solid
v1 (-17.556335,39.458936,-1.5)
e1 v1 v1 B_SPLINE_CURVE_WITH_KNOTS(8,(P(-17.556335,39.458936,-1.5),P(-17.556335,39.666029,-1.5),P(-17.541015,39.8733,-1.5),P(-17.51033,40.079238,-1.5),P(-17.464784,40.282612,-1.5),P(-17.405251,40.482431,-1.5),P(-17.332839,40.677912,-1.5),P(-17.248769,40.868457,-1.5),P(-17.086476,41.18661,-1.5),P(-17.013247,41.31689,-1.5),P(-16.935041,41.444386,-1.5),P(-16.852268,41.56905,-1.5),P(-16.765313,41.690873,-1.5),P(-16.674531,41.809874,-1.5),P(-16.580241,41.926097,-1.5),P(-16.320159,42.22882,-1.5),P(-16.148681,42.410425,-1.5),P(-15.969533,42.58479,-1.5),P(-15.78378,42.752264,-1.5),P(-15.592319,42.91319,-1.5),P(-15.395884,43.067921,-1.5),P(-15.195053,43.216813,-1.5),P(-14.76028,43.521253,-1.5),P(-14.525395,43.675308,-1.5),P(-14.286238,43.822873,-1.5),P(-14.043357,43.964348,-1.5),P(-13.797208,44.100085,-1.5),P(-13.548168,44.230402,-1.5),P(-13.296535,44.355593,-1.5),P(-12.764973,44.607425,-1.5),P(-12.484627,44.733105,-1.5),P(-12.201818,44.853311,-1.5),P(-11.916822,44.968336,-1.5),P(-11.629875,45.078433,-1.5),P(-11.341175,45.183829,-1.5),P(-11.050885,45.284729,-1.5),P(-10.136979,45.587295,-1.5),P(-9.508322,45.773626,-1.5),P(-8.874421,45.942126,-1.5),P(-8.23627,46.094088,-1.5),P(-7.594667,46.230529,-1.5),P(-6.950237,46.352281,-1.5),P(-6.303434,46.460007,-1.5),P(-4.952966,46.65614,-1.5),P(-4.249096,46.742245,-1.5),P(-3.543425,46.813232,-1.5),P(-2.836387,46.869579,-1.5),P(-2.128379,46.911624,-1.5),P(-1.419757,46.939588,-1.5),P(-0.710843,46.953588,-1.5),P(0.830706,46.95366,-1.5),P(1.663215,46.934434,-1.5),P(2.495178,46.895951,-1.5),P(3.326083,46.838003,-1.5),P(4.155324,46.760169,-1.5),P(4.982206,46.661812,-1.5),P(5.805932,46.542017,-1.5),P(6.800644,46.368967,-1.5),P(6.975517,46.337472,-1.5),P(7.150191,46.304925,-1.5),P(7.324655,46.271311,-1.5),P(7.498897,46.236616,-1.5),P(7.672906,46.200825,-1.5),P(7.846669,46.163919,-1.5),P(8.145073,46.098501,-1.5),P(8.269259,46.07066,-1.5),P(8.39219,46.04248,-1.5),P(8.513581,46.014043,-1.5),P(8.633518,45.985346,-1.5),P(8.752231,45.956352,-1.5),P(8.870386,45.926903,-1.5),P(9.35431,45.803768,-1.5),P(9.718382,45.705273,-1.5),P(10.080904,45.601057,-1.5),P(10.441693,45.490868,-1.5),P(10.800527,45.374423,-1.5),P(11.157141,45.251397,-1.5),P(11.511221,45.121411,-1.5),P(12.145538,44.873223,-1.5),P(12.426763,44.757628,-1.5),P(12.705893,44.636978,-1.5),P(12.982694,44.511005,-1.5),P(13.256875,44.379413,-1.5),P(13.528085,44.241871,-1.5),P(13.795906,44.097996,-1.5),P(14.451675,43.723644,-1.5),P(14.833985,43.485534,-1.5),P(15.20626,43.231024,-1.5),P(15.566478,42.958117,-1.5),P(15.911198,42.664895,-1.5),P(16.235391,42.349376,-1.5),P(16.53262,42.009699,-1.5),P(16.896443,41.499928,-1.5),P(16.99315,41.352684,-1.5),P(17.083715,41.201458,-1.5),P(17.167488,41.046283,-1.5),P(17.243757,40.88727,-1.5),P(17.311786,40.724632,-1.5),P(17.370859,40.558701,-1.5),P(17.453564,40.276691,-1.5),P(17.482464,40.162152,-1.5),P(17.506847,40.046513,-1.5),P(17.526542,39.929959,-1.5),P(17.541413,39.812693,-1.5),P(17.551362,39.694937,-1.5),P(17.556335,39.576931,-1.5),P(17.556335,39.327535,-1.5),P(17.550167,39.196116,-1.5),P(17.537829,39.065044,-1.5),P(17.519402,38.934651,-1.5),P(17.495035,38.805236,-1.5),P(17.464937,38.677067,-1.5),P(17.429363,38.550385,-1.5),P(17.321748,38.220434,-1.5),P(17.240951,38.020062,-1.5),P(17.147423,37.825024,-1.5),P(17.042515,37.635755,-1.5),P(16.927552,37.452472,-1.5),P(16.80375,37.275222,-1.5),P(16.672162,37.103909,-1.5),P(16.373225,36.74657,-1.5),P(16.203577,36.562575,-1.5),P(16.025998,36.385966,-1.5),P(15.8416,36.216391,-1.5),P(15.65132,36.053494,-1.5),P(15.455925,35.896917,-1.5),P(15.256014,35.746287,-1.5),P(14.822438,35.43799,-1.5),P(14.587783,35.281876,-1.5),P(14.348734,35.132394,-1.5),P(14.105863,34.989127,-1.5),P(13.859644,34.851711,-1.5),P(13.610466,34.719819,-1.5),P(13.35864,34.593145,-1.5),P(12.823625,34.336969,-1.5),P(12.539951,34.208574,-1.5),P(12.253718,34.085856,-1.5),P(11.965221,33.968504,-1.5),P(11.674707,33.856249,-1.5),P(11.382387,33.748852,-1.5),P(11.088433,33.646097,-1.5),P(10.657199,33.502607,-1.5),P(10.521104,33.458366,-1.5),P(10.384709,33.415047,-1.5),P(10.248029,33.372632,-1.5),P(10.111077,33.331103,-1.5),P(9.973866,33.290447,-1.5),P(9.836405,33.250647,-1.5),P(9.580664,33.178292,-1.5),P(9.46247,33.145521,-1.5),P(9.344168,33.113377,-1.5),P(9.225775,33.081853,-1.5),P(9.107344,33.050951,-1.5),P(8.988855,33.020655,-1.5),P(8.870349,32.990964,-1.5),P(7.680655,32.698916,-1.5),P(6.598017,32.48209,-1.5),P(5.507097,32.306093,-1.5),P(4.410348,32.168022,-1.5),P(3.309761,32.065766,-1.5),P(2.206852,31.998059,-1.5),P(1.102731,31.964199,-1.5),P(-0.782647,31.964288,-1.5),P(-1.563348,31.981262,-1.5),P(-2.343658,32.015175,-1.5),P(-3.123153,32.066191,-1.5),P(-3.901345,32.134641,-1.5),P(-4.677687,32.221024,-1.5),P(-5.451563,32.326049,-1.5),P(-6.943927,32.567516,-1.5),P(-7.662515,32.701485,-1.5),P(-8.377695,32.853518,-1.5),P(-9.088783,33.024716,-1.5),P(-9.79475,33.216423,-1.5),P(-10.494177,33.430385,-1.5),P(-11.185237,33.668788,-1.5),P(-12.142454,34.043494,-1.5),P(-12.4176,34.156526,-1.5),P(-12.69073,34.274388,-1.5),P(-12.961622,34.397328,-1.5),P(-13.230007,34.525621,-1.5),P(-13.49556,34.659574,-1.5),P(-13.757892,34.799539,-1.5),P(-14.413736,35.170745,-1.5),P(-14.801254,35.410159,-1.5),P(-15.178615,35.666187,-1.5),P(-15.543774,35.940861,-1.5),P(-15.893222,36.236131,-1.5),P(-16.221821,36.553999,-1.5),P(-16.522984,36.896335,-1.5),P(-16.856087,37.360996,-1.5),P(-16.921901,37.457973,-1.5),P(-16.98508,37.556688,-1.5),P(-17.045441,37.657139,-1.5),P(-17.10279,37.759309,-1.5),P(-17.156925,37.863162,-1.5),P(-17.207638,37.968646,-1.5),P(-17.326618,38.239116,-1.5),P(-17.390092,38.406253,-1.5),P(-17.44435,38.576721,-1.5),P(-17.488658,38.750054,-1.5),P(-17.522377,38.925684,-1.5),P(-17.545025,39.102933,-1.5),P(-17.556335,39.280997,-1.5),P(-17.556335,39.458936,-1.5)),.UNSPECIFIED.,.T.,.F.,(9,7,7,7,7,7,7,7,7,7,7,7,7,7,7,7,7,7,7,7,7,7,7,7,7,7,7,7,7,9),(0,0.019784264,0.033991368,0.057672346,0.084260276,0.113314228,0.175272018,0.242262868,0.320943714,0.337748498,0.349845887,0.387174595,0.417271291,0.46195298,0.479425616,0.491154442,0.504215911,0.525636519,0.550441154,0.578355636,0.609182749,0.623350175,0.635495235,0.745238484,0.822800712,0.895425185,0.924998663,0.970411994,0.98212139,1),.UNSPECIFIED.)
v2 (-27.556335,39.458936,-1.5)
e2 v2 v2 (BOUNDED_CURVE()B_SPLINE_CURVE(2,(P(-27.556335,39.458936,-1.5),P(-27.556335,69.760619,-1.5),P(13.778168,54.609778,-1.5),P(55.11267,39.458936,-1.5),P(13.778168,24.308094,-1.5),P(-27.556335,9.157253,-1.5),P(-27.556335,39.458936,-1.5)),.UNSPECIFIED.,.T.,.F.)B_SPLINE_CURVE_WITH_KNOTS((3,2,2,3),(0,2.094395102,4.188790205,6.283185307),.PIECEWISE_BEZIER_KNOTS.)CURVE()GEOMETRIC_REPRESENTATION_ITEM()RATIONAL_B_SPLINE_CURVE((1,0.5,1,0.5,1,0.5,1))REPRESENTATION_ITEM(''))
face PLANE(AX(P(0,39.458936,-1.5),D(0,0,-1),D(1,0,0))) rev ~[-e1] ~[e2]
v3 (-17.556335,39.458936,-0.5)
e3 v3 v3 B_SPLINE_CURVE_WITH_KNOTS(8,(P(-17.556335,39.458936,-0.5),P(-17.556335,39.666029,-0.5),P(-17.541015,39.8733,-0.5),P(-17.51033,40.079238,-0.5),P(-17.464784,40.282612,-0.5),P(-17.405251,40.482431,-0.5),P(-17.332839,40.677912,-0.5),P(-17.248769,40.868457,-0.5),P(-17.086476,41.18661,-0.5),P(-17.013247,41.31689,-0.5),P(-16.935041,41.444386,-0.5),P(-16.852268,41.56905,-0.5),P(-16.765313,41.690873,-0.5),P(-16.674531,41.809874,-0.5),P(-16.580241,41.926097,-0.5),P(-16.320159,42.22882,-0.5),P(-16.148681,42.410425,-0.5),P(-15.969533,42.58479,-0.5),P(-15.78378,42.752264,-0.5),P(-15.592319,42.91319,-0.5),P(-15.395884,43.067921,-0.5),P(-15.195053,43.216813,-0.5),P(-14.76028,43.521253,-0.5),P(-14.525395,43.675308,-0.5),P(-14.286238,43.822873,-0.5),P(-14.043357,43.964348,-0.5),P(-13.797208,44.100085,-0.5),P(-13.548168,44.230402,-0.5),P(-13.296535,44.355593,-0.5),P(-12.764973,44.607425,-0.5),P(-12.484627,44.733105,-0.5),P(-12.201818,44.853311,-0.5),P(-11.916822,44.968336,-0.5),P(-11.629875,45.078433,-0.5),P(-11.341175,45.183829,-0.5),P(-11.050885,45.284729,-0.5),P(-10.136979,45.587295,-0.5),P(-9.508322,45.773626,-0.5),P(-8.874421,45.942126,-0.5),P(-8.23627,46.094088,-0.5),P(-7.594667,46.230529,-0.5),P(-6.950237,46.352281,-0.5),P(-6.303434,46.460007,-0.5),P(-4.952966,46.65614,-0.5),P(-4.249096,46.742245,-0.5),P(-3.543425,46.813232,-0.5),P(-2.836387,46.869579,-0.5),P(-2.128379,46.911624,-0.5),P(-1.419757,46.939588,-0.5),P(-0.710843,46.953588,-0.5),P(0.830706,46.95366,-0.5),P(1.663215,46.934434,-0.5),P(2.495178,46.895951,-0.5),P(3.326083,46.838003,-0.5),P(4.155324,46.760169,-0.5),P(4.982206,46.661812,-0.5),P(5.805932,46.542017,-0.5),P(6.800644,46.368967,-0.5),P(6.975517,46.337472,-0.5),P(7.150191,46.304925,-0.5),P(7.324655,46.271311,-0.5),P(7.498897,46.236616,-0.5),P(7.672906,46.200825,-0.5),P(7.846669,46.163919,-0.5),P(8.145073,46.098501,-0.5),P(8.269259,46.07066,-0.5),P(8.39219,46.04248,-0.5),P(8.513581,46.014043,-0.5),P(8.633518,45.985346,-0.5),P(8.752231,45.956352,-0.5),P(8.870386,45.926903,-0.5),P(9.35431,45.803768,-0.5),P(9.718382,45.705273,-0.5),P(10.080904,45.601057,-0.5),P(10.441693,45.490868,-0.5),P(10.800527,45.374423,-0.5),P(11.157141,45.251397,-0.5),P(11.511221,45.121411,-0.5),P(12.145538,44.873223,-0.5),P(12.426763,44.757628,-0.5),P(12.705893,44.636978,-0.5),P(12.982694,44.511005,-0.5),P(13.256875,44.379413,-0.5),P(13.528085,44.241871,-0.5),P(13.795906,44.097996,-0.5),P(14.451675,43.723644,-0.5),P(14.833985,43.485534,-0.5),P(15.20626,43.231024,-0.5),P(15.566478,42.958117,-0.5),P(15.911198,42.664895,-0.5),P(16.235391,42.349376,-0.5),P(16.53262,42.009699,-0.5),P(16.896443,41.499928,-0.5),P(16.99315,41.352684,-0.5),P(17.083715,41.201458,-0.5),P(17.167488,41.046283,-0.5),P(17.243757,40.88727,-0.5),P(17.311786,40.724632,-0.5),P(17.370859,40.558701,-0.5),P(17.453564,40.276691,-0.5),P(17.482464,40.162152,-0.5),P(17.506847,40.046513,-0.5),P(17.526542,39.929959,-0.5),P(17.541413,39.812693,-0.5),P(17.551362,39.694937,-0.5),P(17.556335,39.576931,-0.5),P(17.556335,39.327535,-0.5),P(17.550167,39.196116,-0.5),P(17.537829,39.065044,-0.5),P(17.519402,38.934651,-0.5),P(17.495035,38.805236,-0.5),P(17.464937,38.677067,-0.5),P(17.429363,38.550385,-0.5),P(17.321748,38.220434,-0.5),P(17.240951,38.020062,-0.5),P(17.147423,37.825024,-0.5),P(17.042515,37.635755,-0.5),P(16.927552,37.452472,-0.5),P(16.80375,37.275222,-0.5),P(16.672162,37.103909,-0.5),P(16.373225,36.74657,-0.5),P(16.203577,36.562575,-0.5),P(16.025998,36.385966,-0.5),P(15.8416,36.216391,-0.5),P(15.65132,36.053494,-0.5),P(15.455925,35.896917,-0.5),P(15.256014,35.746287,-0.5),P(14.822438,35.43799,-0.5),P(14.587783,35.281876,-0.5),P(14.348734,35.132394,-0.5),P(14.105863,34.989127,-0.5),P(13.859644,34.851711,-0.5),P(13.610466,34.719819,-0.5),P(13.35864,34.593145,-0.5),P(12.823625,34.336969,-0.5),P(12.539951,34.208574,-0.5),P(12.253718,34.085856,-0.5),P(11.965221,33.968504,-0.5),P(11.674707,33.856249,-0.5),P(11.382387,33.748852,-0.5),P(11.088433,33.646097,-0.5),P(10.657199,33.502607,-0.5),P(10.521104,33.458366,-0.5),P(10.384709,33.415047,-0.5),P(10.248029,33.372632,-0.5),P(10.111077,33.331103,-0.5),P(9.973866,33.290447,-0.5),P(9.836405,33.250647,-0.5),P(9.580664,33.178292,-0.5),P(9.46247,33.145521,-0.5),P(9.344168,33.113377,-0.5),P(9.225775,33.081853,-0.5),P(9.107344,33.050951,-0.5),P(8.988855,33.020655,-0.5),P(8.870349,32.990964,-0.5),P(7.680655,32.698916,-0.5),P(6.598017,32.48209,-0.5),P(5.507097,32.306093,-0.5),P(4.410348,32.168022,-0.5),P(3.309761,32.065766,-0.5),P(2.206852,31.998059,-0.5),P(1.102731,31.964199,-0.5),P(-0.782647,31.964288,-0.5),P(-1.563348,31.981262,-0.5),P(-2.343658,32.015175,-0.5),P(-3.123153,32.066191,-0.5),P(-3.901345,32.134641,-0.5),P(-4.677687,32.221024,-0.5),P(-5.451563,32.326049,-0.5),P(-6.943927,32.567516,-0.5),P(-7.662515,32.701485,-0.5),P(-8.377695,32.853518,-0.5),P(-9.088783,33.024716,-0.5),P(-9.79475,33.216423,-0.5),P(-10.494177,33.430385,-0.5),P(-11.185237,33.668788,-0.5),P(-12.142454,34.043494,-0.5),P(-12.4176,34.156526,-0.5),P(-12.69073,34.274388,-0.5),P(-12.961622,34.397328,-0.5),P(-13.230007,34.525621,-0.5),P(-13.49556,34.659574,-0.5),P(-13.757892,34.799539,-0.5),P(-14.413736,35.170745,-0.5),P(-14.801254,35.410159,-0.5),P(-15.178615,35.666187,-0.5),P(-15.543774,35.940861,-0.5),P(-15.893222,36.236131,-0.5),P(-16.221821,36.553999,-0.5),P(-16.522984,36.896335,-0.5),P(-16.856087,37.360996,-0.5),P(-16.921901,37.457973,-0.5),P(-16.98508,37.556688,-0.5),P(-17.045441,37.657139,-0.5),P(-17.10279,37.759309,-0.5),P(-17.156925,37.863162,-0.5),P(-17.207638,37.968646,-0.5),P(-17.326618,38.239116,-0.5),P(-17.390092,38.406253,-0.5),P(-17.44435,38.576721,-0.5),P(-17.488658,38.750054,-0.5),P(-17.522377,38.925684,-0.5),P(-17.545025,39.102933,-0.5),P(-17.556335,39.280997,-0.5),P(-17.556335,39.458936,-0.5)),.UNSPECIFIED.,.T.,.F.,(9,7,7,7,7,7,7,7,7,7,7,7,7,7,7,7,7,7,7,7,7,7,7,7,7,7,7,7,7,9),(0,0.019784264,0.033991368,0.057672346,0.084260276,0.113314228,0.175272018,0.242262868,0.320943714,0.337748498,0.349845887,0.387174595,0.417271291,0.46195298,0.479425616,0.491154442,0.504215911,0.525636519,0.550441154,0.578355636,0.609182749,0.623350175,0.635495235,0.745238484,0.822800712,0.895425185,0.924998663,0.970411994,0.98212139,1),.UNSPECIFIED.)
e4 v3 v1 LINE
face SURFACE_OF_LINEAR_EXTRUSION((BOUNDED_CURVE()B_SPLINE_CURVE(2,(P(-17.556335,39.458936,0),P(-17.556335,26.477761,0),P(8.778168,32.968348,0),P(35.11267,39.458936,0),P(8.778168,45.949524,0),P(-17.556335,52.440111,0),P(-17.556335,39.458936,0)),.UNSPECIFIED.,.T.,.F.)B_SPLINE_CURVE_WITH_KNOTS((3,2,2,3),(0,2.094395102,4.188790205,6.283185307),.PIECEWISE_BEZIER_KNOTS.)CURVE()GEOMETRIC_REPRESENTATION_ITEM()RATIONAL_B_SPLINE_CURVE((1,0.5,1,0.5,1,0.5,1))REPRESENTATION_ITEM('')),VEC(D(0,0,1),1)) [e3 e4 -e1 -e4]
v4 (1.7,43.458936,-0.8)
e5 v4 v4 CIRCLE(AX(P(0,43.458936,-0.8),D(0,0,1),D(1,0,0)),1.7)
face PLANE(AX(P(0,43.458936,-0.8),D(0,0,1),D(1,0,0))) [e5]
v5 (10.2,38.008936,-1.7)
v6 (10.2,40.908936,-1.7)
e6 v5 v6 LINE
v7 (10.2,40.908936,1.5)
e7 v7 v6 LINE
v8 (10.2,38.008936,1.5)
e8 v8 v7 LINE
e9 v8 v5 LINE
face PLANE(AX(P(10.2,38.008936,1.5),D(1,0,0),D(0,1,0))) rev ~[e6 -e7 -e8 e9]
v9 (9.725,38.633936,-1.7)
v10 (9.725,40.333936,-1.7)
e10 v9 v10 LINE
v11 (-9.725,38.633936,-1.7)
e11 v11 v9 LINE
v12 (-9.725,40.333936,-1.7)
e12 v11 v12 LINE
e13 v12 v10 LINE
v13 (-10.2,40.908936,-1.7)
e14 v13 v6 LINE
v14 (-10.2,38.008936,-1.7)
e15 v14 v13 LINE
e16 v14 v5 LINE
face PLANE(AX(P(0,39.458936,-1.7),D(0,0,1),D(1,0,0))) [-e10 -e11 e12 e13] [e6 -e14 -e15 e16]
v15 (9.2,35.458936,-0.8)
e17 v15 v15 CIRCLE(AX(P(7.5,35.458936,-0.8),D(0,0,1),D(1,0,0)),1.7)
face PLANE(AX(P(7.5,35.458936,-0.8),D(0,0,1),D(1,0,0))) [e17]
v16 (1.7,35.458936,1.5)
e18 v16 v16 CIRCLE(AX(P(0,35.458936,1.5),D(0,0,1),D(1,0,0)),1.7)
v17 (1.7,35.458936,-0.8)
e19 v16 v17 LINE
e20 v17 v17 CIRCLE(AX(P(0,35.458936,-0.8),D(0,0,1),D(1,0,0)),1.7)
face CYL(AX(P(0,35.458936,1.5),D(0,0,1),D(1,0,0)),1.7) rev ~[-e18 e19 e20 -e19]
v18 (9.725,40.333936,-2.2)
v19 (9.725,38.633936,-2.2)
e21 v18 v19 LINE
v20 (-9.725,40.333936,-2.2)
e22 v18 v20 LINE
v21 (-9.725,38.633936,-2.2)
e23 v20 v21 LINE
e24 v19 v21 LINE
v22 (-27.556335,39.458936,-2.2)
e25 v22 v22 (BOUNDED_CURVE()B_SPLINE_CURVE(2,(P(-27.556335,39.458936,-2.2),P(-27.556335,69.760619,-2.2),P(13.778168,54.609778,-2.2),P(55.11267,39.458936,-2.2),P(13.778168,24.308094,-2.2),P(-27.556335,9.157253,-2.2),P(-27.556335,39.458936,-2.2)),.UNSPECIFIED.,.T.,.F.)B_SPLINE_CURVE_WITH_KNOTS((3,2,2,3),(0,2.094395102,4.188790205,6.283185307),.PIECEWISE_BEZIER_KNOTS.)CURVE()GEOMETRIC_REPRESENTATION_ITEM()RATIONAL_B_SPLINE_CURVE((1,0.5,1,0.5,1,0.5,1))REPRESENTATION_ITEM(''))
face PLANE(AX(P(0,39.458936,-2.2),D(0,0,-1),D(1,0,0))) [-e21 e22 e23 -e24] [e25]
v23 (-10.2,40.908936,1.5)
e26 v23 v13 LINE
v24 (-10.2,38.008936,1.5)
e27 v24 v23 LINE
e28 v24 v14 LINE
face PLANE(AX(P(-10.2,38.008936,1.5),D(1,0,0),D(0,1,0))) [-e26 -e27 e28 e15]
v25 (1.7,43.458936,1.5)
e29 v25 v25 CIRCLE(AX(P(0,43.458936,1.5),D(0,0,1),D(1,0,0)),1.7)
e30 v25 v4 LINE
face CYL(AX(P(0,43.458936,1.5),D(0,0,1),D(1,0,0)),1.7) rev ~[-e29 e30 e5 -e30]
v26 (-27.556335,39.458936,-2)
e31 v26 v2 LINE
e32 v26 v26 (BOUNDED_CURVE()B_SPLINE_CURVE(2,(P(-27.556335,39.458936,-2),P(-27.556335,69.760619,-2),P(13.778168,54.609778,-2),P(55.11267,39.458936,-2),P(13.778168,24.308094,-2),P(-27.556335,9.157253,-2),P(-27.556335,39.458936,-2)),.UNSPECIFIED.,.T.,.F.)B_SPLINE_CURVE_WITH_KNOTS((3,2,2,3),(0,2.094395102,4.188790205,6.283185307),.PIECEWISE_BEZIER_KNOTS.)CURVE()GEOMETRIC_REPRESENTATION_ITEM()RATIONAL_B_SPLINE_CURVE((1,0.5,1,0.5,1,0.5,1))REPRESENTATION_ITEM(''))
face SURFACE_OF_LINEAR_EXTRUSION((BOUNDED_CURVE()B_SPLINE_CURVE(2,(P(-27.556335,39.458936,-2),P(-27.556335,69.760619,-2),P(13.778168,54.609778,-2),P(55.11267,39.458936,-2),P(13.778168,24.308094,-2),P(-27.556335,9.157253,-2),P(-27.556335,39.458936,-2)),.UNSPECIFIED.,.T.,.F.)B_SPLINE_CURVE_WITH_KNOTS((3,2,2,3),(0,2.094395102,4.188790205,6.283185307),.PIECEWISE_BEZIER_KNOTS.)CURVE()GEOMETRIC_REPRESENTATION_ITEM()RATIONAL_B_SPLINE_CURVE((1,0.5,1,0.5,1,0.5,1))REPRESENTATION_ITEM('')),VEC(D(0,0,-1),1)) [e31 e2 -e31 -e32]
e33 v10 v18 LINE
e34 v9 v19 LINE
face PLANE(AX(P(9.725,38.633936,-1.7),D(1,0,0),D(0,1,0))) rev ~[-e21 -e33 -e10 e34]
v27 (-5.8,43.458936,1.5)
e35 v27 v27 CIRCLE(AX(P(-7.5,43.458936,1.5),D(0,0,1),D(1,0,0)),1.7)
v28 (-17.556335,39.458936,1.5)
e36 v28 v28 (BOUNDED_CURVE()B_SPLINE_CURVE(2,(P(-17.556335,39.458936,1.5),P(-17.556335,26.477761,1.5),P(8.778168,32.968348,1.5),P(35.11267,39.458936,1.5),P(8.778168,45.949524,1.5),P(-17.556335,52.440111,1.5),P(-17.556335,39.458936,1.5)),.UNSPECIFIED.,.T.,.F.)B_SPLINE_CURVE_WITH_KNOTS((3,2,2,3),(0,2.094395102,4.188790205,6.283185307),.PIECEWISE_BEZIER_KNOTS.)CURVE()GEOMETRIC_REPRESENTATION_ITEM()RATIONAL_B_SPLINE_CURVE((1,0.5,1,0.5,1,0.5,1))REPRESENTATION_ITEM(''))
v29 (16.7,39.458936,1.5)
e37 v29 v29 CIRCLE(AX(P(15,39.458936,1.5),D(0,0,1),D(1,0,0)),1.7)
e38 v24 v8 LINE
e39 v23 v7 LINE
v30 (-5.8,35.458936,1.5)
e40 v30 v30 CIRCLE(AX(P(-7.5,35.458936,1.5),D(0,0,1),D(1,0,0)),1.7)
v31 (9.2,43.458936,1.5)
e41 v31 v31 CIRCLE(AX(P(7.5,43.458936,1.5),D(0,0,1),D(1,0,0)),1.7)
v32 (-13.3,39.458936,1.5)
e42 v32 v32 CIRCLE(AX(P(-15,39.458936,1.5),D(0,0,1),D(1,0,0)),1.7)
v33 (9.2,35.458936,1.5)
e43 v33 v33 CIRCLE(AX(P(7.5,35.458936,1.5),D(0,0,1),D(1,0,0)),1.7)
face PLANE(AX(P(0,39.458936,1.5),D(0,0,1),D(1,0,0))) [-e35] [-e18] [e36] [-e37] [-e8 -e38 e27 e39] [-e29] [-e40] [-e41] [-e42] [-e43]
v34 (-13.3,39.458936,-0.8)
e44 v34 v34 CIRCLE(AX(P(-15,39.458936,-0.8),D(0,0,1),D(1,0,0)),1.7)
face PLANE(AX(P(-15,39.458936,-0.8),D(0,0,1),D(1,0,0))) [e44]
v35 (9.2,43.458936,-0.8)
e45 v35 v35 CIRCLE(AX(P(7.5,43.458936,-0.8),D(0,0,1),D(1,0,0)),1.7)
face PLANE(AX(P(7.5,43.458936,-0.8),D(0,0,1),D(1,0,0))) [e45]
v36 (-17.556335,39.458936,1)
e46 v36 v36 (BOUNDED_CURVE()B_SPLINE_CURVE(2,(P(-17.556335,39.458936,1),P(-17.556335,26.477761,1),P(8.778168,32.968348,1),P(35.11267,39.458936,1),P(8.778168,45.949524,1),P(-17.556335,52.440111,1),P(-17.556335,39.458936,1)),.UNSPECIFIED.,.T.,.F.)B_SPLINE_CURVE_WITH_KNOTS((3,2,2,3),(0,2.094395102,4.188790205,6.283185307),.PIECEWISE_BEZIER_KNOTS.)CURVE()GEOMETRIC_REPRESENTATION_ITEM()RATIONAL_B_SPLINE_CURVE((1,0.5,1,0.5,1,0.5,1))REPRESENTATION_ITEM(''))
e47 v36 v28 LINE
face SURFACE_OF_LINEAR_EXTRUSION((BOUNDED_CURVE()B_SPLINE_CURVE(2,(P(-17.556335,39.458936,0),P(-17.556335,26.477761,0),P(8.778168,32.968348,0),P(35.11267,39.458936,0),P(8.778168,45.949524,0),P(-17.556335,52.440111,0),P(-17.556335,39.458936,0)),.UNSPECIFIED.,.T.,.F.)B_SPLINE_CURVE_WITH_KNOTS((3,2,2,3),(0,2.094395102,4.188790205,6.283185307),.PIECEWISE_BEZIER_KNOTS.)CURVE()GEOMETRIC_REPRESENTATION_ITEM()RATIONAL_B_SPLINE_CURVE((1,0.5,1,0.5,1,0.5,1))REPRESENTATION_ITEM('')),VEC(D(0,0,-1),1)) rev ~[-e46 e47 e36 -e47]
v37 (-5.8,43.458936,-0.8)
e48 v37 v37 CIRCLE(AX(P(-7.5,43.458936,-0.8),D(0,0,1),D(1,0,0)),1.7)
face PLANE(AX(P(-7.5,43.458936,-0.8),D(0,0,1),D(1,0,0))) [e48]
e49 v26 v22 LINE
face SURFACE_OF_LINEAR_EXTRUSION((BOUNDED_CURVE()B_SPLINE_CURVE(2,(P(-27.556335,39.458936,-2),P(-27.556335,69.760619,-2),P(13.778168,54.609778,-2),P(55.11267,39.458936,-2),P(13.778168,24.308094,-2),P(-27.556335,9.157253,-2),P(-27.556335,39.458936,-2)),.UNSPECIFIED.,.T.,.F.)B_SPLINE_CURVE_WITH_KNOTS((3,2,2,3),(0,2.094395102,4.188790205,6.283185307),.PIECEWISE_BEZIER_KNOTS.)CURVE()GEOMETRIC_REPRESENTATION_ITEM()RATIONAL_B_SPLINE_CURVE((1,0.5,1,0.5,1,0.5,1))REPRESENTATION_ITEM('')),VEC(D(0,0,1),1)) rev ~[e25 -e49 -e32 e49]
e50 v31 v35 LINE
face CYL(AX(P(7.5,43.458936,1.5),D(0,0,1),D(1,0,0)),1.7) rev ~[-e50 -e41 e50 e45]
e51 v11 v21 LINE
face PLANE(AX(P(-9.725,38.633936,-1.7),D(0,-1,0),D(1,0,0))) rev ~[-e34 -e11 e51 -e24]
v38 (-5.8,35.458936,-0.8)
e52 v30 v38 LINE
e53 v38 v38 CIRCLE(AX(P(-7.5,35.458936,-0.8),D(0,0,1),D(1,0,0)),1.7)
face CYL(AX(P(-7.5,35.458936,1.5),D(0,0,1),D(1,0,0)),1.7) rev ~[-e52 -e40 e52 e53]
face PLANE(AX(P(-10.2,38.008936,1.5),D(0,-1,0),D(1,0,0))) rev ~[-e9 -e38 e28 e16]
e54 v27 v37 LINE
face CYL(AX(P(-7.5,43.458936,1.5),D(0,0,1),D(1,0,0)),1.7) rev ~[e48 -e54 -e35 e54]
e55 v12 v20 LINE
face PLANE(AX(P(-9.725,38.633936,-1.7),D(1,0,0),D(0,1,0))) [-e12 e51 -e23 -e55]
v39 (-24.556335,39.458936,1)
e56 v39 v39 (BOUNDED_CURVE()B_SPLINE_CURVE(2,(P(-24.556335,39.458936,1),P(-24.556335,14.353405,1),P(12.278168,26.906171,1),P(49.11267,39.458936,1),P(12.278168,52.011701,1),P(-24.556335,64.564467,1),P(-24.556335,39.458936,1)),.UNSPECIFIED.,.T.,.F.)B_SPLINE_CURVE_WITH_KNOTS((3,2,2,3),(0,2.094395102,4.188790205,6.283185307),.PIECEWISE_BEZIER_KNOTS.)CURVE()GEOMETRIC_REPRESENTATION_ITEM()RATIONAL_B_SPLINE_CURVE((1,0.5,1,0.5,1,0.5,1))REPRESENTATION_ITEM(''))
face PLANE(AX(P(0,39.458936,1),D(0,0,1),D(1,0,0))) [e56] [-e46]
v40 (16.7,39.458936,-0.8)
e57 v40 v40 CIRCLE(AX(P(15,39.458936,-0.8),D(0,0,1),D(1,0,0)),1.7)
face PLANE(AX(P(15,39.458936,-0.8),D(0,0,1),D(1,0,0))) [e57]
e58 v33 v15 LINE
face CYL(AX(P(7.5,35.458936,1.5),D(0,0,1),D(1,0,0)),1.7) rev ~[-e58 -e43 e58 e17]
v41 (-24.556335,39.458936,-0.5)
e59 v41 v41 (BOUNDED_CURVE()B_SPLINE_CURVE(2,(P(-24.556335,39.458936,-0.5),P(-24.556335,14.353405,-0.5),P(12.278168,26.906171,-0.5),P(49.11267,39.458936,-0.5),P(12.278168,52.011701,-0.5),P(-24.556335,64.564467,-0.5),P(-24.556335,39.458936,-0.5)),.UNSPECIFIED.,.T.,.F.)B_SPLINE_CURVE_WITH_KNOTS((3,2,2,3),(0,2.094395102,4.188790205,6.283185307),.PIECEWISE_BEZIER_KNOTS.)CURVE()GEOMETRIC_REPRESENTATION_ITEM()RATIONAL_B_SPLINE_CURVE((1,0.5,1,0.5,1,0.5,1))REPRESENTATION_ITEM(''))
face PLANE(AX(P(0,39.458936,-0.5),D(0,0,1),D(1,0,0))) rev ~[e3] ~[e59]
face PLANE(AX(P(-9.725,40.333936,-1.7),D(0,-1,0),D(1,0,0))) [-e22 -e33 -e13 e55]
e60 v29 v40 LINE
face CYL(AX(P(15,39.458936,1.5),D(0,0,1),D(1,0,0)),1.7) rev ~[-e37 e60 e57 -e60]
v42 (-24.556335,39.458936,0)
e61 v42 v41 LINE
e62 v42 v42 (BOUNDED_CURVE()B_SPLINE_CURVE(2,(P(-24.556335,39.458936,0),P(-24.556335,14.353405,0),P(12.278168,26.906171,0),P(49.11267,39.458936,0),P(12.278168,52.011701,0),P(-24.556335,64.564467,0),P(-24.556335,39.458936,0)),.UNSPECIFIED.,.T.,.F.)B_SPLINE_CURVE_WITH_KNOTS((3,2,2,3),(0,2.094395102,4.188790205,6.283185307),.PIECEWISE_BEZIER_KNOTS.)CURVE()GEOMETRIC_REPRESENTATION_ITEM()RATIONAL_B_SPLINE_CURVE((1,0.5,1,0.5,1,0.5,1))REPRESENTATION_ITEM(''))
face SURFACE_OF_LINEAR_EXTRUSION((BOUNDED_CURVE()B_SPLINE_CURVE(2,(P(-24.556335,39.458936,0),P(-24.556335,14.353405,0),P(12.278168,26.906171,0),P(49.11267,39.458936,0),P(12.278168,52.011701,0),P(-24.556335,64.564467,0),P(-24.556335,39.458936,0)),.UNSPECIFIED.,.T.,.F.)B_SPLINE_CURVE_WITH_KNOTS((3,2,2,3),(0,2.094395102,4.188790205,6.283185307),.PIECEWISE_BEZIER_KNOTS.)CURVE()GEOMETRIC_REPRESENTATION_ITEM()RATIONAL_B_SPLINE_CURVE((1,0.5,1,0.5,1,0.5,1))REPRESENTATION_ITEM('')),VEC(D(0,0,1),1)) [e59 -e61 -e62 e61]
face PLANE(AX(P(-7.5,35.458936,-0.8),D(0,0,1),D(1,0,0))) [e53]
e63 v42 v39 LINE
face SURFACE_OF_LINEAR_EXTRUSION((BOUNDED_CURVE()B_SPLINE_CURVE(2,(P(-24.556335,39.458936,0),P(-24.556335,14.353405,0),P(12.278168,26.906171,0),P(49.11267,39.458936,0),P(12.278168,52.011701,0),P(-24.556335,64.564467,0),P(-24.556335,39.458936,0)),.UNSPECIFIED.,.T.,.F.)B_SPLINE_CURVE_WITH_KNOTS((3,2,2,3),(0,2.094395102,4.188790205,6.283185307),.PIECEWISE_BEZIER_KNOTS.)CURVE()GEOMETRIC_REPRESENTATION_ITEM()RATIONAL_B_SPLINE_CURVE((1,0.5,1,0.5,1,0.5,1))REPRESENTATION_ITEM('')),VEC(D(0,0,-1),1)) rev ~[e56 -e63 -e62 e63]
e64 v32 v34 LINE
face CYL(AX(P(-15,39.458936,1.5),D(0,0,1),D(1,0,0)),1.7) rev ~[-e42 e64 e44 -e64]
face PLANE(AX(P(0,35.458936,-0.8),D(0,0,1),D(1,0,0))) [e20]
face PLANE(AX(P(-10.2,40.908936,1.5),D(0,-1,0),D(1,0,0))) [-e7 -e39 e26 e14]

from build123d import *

# Parameters (mm, degrees)
F1_DEPTH  = 2
F3_DEPTH  = 0.5
F5_DEPTH  = 1.5
F7_R      = 1.7
F8_DEPTH  = 2.3
F10_DEPTH = 0.5
F12_DEPTH = 0.2
F6_W      = 20.4
F6_H      = 2.9
F13_DEPTH = 3.2
F14_W     = 19.45
F14_H     = 1.7
F15_DEPTH = 1
F17_DEPTH = 1
F19_DEPTH = 0.2


# Not quite as in the source:
# - a feature names something its author has since deleted; it is built from what else it names


with BuildPart() as f1:
    # F0 (on Top) → F1 (new body)
    with BuildSketch(Plane.XY):
        with BuildLine():
            add(Edge.make_bspline(
                [(-17.556335, 39.4589360392), (-17.556335, 26.4777608324), (8.7781675, 32.9683484358), (35.11267, 39.4589360392), (8.7781675, 45.9495236425), (-17.556335, 52.4401112459), (-17.556335, 39.4589360392)],
                knots=[0, 0, 0, 2.0943951024, 2.0943951024, 4.1887902048, 4.1887902048, 6.2831853072, 6.2831853072, 6.2831853072], degree=2, weights=[1, 0.5, 1, 0.5, 1, 0.5, 1]))
        make_face()
    extrude(amount=-F1_DEPTH)

    # F2 (on face) → F3 (join)
    with BuildSketch(Plane.XY):
        with BuildLine():
            add(Edge.make_bspline(
                [(-24.556335, 39.4589360392), (-24.556335, 14.3534051795), (12.2781675, 26.9061706093), (49.11267, 39.4589360392), (12.2781675, 52.011701469), (-24.556335, 64.5644668989), (-24.556335, 39.4589360392)],
                knots=[0, 0, 0, 2.0943951024, 2.0943951024, 4.1887902048, 4.1887902048, 6.2831853072, 6.2831853072, 6.2831853072], degree=2, weights=[1, 0.5, 1, 0.5, 1, 0.5, 1]))
        make_face()
    extrude(amount=-F3_DEPTH)

    # F4 (on face) → F5 (join)
    with BuildSketch(Plane.XY):
        with BuildLine():
            add(Edge.make_bspline(
                [(-17.556335, 39.4589360392), (-17.556335, 26.4777608324), (8.7781675, 32.9683484358), (35.11267, 39.4589360392), (8.7781675, 45.9495236425), (-17.556335, 52.4401112459), (-17.556335, 39.4589360392)],
                knots=[0, 0, 0, 2.0943951024, 2.0943951024, 4.1887902048, 4.1887902048, 6.2831853072, 6.2831853072, 6.2831853072], degree=2, weights=[1, 0.5, 1, 0.5, 1, 0.5, 1]))
        make_face()
    extrude(amount=F5_DEPTH)

    # F7 (on face) → F8 (cut)
    with BuildSketch(Plane.XY.offset(1.5)):
        with Locations((-15, 39.4589360392)):
            Circle(F7_R)
        with Locations((0, 43.4589360392)):
            Circle(F7_R)
        with Locations((15, 39.4589360392)):
            Circle(F7_R)
        with Locations((0, 35.4589360392)):
            Circle(F7_R)
        with Locations((-7.5, 35.4589360392)):
            Circle(F7_R)
        with Locations((-7.5, 43.4589360392)):
            Circle(F7_R)
        with Locations((7.5, 43.4589360392)):
            Circle(F7_R)
        with Locations((7.5, 35.4589360392)):
            Circle(F7_R)
    extrude(amount=-F8_DEPTH, mode=Mode.SUBTRACT)

    # F9 (on face) → F10 (join)
    with BuildSketch(Plane(origin=(0, 0, -2), x_dir=(1, 0, 0), z_dir=(0, 0, -1))):
        with BuildLine():
            add(Edge.make_bspline(
                [(-27.556335, -39.4589360392), (-27.556335, -69.7606193216), (13.7781675, -54.6097776804), (55.11267, -39.4589360392), (13.7781675, -24.308094398), (-27.556335, -9.1572527567), (-27.556335, -39.4589360392)],
                knots=[0, 0, 0, 2.0943951024, 2.0943951024, 4.1887902048, 4.1887902048, 6.2831853072, 6.2831853072, 6.2831853072], degree=2, weights=[1, 0.5, 1, 0.5, 1, 0.5, 1]))
        make_face()
    extrude(amount=-F10_DEPTH)

    # F11 (on face) → F12 (join)
    with BuildSketch(Plane(origin=(0, 0, -2), x_dir=(1, 0, 0), z_dir=(0, 0, -1))):
        with BuildLine():
            add(Edge.make_bspline(
                [(-17.556335, -39.4589360392), (-17.556335, -52.4401112459), (8.7781675, -45.9495236425), (35.11267, -39.4589360392), (8.7781675, -32.9683484358), (-17.556335, -26.4777608324), (-17.556335, -39.4589360392)],
                knots=[0, 0, 0, 2.0943951024, 2.0943951024, 4.1887902048, 4.1887902048, 6.2831853072, 6.2831853072, 6.2831853072], degree=2, weights=[1, 0.5, 1, 0.5, 1, 0.5, 1]))
        make_face()
    extrude(amount=F12_DEPTH)

    # F6 (on face) → F13 (cut)
    with BuildSketch(Plane.XY.offset(1.5)):
        with Locations((0, 39.4589360392)):
            Rectangle(F6_W, F6_H)
    extrude(amount=-F13_DEPTH, mode=Mode.SUBTRACT)

    # F14 (on face) → F15 (cut)
    with BuildSketch(Plane.XY.offset(-1.7)):
        with Locations((0, 39.4839360392)):
            Rectangle(F14_W, F14_H)
    extrude(amount=-F15_DEPTH, mode=Mode.SUBTRACT)

    # F16 (on face) → F17 (join)
    with BuildSketch(Plane.XY):
        with BuildLine():
            add(Edge.make_bspline(
                [(-24.556335, 39.4589360392), (-24.556335, 14.3534051795), (12.2781675, 26.9061706093), (49.11267, 39.4589360392), (12.2781675, 52.011701469), (-24.556335, 64.5644668989), (-24.556335, 39.4589360392)],
                knots=[0, 0, 0, 2.0943951024, 2.0943951024, 4.1887902048, 4.1887902048, 6.2831853072, 6.2831853072, 6.2831853072], degree=2, weights=[1, 0.5, 1, 0.5, 1, 0.5, 1]))
        make_face()
        with BuildLine():
            add(Edge.make_bspline(
                [(-17.556335, 39.4589360392), (-17.556335, 26.4777608324), (8.7781675, 32.9683484358), (35.11267, 39.4589360392), (8.7781675, 45.9495236425), (-17.556335, 52.4401112459), (-17.556335, 39.4589360392)],
                knots=[0, 0, 0, 2.0943951024, 2.0943951024, 4.1887902048, 4.1887902048, 6.2831853072, 6.2831853072, 6.2831853072], degree=2, weights=[1, 0.5, 1, 0.5, 1, 0.5, 1]))
        make_face(mode=Mode.SUBTRACT)
    extrude(amount=F17_DEPTH)

    # F18 (on face) → F19 (join)
    with BuildSketch(Plane(origin=(0, 0, -2), x_dir=(1, 0, 0), z_dir=(0, 0, -1))):
        with BuildLine():
            add(Edge.make_bspline(
                [(-27.556335, -39.4589360392), (-27.556335, -69.7606193216), (13.7781675, -54.6097776804), (55.11267, -39.4589360392), (13.7781675, -24.308094398), (-27.556335, -9.1572527567), (-27.556335, -39.4589360392)],
                knots=[0, 0, 0, 2.0943951024, 2.0943951024, 4.1887902048, 4.1887902048, 6.2831853072, 6.2831853072, 6.2831853072], degree=2, weights=[1, 0.5, 1, 0.5, 1, 0.5, 1]))
        make_face()
        with BuildLine():
            add(Edge.make_bspline(
                [(-17.556335, -39.4589360392), (-17.556335, -52.4401112459), (8.7781675, -45.9495236425), (35.11267, -39.4589360392), (8.7781675, -32.9683484358), (-17.556335, -26.4777608324), (-17.556335, -39.4589360392)],
                knots=[0, 0, 0, 2.0943951024, 2.0943951024, 4.1887902048, 4.1887902048, 6.2831853072, 6.2831853072, 6.2831853072], degree=2, weights=[1, 0.5, 1, 0.5, 1, 0.5, 1]))
        make_face(mode=Mode.SUBTRACT)
    extrude(amount=F19_DEPTH)


solid = f1.part
